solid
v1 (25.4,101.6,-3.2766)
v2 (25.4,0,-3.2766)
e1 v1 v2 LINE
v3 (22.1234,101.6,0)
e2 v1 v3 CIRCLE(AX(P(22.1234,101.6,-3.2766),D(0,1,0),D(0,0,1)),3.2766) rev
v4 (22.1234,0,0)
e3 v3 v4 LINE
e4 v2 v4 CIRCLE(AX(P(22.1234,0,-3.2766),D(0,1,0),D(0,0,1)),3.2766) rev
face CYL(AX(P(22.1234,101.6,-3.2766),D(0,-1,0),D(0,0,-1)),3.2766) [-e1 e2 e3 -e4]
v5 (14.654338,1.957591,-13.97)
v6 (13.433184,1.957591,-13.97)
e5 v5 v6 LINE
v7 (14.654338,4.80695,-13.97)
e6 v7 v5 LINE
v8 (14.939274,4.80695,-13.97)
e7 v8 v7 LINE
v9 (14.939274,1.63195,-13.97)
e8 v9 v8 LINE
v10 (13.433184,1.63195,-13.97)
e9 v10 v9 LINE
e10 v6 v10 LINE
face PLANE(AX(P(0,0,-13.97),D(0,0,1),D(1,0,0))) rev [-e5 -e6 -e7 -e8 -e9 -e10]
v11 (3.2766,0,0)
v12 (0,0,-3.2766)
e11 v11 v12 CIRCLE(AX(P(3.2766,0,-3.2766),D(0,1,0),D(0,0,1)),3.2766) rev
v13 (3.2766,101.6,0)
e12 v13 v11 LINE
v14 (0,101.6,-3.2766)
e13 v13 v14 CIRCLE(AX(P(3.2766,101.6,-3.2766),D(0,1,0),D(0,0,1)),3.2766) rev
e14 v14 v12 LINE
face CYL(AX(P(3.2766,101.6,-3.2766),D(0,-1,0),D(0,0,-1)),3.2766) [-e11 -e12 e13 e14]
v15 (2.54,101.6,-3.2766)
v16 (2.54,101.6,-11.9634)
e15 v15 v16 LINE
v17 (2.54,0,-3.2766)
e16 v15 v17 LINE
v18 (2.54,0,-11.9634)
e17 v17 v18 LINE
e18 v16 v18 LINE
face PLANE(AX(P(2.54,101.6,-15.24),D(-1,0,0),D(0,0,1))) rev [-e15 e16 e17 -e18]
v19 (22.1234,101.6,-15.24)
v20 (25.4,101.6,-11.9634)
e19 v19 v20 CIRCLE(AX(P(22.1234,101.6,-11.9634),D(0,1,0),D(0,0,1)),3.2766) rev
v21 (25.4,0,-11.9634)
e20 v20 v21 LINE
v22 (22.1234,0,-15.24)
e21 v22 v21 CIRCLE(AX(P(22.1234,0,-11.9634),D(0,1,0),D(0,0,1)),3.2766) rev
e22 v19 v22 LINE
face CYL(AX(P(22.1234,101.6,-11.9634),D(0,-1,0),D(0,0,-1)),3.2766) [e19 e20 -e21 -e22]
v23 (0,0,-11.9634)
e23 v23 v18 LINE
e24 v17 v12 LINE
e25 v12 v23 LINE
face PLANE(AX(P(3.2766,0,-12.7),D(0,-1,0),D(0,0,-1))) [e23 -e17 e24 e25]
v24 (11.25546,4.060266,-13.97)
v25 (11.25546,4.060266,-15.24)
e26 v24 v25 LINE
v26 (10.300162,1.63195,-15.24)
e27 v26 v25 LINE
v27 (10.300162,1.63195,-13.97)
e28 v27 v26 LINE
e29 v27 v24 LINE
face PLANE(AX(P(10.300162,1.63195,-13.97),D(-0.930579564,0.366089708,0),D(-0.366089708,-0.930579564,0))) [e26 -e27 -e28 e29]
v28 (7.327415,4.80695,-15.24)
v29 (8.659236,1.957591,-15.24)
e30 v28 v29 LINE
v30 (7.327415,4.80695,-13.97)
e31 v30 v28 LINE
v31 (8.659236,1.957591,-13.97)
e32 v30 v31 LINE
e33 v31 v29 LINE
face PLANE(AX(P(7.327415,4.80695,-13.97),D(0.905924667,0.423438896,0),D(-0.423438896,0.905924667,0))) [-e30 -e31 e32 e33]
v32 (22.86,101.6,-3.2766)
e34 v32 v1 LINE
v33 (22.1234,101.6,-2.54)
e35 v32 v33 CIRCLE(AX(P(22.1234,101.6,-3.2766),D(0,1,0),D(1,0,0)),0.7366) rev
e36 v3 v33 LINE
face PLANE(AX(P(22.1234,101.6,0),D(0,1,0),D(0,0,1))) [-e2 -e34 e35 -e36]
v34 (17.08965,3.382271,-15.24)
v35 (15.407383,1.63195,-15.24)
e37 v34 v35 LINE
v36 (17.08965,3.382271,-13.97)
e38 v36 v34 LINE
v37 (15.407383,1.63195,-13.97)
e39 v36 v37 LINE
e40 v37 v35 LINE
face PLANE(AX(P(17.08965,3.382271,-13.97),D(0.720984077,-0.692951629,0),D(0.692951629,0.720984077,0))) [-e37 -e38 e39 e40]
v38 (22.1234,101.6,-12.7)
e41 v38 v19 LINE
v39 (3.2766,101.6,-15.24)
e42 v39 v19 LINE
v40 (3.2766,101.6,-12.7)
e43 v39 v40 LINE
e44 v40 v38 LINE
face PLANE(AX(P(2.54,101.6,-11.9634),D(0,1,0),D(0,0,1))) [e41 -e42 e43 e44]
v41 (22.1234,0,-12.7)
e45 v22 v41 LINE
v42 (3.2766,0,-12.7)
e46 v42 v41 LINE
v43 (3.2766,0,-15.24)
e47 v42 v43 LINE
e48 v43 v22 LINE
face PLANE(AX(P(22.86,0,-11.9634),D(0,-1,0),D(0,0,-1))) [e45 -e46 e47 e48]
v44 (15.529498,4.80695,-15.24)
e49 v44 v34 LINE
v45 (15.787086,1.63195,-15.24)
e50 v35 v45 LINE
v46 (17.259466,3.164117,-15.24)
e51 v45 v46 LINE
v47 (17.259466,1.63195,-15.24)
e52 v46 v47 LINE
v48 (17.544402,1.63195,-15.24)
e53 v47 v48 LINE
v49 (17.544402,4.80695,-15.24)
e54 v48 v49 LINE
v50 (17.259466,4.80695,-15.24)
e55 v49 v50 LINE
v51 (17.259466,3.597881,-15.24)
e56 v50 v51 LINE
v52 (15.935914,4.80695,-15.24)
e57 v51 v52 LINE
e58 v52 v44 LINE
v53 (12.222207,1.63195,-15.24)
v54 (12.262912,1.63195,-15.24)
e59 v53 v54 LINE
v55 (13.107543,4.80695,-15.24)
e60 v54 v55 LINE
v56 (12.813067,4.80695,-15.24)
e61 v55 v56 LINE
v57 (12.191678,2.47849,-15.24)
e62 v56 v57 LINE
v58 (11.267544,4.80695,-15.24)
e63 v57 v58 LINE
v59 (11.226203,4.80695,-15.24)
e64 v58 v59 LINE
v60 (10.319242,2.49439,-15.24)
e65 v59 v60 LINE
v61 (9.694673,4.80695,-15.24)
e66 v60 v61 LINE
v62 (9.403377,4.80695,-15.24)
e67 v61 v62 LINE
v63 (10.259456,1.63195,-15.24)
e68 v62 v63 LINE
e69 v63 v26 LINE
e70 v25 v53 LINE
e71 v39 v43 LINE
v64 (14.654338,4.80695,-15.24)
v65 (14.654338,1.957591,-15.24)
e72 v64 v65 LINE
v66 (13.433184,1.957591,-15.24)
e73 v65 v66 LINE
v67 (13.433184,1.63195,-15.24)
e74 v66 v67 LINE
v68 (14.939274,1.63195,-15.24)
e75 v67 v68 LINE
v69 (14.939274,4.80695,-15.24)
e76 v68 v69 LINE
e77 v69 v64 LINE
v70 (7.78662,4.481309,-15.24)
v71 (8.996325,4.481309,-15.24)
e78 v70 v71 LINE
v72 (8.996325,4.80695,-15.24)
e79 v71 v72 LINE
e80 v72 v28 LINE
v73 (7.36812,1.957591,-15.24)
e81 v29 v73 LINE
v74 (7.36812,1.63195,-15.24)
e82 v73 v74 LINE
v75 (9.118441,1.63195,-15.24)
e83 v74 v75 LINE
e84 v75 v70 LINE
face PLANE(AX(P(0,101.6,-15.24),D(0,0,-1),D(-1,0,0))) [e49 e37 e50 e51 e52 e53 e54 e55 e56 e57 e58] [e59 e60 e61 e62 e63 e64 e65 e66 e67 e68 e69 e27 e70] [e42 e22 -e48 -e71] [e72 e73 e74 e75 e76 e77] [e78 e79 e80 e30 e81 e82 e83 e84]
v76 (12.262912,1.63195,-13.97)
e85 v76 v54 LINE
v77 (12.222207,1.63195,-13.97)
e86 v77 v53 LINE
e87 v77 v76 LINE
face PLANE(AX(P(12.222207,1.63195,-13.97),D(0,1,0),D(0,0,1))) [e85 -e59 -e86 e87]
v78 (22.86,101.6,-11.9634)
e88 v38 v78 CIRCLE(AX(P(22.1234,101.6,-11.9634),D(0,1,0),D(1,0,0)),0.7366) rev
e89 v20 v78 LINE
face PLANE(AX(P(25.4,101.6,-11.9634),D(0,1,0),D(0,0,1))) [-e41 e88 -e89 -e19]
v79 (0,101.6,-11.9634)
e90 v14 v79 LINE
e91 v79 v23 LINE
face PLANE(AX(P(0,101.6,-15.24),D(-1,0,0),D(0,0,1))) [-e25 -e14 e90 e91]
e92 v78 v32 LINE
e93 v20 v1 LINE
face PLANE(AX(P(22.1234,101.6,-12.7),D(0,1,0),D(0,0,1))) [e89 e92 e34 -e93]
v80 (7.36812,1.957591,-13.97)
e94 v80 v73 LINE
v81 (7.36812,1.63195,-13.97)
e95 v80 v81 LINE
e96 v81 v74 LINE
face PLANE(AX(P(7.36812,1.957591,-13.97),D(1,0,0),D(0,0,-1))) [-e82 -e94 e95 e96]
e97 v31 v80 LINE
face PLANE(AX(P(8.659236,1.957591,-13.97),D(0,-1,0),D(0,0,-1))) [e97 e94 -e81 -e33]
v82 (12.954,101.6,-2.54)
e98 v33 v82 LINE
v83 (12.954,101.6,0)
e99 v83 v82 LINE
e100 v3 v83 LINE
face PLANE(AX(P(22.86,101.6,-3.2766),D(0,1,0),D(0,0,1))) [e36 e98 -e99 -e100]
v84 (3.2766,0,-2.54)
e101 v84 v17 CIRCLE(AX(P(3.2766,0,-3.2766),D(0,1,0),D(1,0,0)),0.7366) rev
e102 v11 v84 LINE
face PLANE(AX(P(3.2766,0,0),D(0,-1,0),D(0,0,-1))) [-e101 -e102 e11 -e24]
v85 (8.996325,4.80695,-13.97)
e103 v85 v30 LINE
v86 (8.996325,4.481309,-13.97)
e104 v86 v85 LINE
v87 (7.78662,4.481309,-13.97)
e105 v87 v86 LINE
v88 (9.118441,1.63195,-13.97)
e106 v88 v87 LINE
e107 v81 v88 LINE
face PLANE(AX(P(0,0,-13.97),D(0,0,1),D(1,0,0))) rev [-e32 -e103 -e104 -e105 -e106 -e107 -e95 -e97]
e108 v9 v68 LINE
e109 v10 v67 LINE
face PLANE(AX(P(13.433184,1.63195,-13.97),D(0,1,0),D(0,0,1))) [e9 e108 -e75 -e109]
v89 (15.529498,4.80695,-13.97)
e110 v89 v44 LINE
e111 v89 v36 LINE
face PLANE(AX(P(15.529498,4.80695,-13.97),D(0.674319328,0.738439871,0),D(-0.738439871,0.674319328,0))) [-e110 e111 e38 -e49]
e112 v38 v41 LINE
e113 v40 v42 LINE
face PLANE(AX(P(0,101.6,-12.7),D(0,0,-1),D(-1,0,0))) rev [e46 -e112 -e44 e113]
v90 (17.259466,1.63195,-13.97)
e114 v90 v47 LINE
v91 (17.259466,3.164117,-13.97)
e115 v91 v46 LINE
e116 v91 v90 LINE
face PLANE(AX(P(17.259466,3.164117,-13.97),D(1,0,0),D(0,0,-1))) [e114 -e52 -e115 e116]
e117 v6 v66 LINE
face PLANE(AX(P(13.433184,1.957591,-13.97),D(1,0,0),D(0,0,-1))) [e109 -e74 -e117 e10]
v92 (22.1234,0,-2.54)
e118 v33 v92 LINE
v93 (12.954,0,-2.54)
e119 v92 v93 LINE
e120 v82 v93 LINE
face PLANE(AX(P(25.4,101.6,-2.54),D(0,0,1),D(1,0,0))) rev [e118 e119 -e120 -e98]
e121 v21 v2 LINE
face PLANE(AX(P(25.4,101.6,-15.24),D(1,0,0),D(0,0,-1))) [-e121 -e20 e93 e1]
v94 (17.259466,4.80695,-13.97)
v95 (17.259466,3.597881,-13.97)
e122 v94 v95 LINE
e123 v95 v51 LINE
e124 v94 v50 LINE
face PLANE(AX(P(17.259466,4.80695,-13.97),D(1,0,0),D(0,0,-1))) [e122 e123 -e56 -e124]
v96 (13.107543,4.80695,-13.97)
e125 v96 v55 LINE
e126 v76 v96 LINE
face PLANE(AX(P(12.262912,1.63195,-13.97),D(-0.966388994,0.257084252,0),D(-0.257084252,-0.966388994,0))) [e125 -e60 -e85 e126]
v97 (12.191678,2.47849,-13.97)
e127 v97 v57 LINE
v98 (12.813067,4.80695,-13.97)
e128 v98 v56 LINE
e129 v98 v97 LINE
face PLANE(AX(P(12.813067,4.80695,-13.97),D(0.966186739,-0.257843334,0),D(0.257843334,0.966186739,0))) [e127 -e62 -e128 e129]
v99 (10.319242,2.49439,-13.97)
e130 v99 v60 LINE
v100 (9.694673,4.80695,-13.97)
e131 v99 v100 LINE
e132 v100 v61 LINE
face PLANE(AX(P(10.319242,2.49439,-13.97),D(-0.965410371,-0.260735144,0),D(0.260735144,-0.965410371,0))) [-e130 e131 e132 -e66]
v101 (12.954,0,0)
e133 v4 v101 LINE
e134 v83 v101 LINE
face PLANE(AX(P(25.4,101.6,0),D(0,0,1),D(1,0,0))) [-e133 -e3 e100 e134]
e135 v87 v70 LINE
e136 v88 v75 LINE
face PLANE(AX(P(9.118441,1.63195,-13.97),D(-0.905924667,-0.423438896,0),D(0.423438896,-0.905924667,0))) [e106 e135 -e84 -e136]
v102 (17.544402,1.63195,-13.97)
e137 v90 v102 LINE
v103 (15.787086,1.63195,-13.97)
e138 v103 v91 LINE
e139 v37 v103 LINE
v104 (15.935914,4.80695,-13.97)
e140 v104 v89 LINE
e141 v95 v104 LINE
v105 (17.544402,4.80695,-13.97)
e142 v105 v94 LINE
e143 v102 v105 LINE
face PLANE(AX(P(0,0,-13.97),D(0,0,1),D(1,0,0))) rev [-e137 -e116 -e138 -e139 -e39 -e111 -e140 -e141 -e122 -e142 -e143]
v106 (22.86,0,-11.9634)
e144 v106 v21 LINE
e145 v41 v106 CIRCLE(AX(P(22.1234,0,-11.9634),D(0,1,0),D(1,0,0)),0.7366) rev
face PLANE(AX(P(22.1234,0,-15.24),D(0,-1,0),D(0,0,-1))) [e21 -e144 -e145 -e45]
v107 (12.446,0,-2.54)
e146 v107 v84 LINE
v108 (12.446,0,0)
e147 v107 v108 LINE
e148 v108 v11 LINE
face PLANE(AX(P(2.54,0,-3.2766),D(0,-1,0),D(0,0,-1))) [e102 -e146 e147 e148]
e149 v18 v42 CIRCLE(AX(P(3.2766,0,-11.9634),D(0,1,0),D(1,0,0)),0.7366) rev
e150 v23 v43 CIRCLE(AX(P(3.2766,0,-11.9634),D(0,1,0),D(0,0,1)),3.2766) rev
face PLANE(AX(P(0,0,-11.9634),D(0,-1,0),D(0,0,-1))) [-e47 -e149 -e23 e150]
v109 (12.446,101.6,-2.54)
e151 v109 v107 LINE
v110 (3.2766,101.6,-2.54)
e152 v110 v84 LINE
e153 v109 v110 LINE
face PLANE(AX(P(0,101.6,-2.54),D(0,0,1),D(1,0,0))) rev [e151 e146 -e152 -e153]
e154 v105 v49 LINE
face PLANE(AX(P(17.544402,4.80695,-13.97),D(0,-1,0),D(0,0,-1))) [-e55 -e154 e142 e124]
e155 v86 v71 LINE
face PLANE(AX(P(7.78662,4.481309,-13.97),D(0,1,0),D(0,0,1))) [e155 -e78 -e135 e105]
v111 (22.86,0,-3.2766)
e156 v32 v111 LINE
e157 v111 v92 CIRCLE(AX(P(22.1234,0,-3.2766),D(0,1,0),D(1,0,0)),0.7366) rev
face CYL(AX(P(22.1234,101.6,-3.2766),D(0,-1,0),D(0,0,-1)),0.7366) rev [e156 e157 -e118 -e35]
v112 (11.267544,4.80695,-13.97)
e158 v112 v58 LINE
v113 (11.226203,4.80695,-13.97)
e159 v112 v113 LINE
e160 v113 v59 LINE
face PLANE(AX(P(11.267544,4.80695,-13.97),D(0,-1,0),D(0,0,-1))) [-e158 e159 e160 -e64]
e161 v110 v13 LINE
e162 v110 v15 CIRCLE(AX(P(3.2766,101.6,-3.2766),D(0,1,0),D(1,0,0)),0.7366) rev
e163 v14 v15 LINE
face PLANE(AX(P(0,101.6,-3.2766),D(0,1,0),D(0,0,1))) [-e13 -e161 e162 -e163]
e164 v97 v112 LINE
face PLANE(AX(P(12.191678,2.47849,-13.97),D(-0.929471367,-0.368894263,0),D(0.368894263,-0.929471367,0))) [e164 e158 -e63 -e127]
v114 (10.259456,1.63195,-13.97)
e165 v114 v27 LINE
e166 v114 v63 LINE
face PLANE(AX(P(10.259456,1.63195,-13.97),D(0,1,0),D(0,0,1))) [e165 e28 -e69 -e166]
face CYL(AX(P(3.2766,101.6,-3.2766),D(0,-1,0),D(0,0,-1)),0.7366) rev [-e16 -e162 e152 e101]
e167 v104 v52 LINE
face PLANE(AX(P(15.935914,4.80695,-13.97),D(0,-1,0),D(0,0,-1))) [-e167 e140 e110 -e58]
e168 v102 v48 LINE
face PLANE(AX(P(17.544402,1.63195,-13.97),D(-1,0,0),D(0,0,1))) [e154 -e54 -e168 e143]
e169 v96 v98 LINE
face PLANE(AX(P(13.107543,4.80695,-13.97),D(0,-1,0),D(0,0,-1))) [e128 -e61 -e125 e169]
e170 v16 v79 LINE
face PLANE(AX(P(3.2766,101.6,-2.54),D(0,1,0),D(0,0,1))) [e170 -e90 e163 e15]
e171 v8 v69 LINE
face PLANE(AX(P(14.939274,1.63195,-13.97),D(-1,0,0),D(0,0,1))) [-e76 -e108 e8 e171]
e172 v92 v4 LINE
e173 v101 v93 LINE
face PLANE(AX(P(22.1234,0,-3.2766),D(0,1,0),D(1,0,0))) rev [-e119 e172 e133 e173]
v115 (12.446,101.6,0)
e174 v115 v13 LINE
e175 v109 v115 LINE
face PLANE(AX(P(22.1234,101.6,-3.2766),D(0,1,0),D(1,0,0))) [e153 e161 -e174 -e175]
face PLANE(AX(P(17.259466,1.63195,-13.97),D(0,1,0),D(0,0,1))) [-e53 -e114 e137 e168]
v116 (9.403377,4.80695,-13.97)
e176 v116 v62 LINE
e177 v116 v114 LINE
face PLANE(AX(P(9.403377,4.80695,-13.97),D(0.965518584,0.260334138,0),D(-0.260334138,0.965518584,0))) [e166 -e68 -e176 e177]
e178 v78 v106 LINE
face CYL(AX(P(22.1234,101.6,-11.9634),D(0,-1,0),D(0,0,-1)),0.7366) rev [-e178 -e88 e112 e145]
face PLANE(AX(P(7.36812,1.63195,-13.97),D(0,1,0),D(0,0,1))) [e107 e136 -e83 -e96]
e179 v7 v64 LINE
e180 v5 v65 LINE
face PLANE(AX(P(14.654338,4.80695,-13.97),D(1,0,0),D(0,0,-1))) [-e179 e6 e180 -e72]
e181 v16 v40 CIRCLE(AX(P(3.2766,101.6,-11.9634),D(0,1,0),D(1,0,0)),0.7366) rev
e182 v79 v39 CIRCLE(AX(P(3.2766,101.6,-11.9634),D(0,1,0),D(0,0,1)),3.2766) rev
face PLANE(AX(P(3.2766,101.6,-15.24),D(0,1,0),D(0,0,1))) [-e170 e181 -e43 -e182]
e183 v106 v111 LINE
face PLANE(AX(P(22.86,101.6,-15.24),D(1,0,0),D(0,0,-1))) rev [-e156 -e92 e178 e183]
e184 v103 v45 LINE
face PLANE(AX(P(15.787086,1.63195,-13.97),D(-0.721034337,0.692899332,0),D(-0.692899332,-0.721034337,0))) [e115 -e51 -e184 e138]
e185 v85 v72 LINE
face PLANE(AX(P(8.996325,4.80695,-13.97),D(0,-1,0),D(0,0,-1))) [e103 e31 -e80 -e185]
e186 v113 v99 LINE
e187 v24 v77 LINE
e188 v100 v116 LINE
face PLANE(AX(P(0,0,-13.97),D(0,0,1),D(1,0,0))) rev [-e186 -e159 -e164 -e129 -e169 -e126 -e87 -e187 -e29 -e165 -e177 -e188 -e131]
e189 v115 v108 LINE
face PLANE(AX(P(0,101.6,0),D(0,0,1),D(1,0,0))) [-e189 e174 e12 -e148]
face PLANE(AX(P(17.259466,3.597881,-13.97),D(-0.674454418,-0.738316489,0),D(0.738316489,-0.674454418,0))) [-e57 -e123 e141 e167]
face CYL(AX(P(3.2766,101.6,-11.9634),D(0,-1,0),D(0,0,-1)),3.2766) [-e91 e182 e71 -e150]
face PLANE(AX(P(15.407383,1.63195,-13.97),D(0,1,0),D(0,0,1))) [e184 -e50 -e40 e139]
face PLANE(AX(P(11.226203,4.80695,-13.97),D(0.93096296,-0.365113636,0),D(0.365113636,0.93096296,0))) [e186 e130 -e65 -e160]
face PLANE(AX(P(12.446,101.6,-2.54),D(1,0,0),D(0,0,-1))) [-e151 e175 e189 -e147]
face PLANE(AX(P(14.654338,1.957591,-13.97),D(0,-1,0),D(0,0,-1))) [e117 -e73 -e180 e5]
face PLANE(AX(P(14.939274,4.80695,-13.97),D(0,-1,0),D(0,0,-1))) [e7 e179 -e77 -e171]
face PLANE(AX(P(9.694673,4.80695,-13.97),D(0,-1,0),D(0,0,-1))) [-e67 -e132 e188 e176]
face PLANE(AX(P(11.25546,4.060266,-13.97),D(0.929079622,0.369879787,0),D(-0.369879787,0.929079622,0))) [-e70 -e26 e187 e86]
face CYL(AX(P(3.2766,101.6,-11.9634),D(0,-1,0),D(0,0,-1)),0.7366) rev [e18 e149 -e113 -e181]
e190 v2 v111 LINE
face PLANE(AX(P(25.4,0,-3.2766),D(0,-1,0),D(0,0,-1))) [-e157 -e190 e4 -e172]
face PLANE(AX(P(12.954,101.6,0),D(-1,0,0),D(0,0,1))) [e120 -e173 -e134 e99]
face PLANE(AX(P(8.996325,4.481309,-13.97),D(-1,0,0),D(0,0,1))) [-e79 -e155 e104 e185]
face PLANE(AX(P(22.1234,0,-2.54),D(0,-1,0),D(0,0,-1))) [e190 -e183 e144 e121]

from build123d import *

# Parameters (mm, degrees)
BASE_FLANGE2_DEPTH = 101.6
CUT_EXTRUDE1_DEPTH = 1.27


# Sheet-metal steps are written as plain solids
with BuildPart() as part:
    # Sketch1 → Base-Flange2 (new body)
    with BuildSketch(Plane(origin=(0, 0, 0), x_dir=(1, 0, 0), z_dir=(0, 1, 0))):
        with BuildLine():
            Line((12.954, 0), (22.1234, 0))
            ThreePointArc((22.1234, 0), (24.440306079, 0.959693921), (25.4, 3.2766))
            Line((25.4, 3.2766), (25.4, 11.9634))
            ThreePointArc((25.4, 11.9634), (24.440306079, 14.280306079), (22.1234, 15.24))
            Line((22.1234, 15.24), (3.2766, 15.24))
            ThreePointArc((3.2766, 15.24), (0.959693921, 14.280306079), (0, 11.9634))
            Line((0, 11.9634), (0, 3.2766))
            ThreePointArc((0, 3.2766), (0.959693921, 0.959693921), (3.2766, 0))
            Line((3.2766, 0), (12.446, 0))
            Line((12.446, 0), (12.446, 2.54))
            Line((12.446, 2.54), (3.2766, 2.54))
            ThreePointArc((3.2766, 2.54), (2.755745145, 2.755745145), (2.54, 3.2766))
            Line((2.54, 3.2766), (2.54, 11.9634))
            ThreePointArc((2.54, 11.9634), (2.755745145, 12.484254855), (3.2766, 12.7))
            Line((3.2766, 12.7), (22.1234, 12.7))
            ThreePointArc((22.1234, 12.7), (22.644254855, 12.484254855), (22.86, 11.9634))
            Line((22.86, 11.9634), (22.86, 3.2766))
            ThreePointArc((22.86, 3.2766), (22.644254855, 2.755745145), (22.1234, 2.54))
            Line((22.1234, 2.54), (12.954, 2.54))
            Line((12.954, 2.54), (12.954, 0))
        make_face()
    extrude(amount=BASE_FLANGE2_DEPTH)

    # Sketch2 → Cut-Extrude1 (cut)
    with BuildSketch(Plane(origin=(0, 0, -15.24), x_dir=(-1, 0, 0), z_dir=(0, 0, -1))):
        Polygon((-17.544402312, 4.806950327), (-17.259466414, 4.806950327), (-17.259466414, 3.597880815), (-15.93591373, 4.806950327), (-15.529498466, 4.806950327), (-17.089649708, 3.38227084), (-15.407383081, 1.631950327), (-15.787085605, 1.631950327), (-17.259466414, 3.164116793), (-17.259466414, 1.631950327), (-17.544402312, 1.631950327), align=None)
        Polygon((-14.939274107, 4.806950327), (-14.654338209, 4.806950327), (-14.654338209, 1.957591352), (-13.433184363, 1.957591352), (-13.433184363, 1.631950327), (-14.939274107, 1.631950327), align=None)
        Polygon((-13.107543337, 4.806950327), (-12.813067176, 4.806950327), (-12.191677953, 2.47848979), (-11.267544339, 4.806950327), (-11.226203193, 4.806950327), (-10.319242055, 2.494390231), (-9.694672744, 4.806950327), (-9.403376671, 4.806950327), (-10.259456398, 1.631950327), (-10.300161526, 1.631950327), (-11.255460004, 4.060265631), (-12.222206799, 1.631950327), (-12.262911927, 1.631950327), align=None)
        Polygon((-8.996325389, 4.481309301), (-8.996325389, 4.806950327), (-7.327415132, 4.806950327), (-8.659236046, 1.957591352), (-7.36812026, 1.957591352), (-7.36812026, 1.631950327), (-9.118440773, 1.631950327), (-7.78661986, 4.481309301), align=None)
    extrude(amount=-CUT_EXTRUDE1_DEPTH, mode=Mode.SUBTRACT)


solid = part.part
